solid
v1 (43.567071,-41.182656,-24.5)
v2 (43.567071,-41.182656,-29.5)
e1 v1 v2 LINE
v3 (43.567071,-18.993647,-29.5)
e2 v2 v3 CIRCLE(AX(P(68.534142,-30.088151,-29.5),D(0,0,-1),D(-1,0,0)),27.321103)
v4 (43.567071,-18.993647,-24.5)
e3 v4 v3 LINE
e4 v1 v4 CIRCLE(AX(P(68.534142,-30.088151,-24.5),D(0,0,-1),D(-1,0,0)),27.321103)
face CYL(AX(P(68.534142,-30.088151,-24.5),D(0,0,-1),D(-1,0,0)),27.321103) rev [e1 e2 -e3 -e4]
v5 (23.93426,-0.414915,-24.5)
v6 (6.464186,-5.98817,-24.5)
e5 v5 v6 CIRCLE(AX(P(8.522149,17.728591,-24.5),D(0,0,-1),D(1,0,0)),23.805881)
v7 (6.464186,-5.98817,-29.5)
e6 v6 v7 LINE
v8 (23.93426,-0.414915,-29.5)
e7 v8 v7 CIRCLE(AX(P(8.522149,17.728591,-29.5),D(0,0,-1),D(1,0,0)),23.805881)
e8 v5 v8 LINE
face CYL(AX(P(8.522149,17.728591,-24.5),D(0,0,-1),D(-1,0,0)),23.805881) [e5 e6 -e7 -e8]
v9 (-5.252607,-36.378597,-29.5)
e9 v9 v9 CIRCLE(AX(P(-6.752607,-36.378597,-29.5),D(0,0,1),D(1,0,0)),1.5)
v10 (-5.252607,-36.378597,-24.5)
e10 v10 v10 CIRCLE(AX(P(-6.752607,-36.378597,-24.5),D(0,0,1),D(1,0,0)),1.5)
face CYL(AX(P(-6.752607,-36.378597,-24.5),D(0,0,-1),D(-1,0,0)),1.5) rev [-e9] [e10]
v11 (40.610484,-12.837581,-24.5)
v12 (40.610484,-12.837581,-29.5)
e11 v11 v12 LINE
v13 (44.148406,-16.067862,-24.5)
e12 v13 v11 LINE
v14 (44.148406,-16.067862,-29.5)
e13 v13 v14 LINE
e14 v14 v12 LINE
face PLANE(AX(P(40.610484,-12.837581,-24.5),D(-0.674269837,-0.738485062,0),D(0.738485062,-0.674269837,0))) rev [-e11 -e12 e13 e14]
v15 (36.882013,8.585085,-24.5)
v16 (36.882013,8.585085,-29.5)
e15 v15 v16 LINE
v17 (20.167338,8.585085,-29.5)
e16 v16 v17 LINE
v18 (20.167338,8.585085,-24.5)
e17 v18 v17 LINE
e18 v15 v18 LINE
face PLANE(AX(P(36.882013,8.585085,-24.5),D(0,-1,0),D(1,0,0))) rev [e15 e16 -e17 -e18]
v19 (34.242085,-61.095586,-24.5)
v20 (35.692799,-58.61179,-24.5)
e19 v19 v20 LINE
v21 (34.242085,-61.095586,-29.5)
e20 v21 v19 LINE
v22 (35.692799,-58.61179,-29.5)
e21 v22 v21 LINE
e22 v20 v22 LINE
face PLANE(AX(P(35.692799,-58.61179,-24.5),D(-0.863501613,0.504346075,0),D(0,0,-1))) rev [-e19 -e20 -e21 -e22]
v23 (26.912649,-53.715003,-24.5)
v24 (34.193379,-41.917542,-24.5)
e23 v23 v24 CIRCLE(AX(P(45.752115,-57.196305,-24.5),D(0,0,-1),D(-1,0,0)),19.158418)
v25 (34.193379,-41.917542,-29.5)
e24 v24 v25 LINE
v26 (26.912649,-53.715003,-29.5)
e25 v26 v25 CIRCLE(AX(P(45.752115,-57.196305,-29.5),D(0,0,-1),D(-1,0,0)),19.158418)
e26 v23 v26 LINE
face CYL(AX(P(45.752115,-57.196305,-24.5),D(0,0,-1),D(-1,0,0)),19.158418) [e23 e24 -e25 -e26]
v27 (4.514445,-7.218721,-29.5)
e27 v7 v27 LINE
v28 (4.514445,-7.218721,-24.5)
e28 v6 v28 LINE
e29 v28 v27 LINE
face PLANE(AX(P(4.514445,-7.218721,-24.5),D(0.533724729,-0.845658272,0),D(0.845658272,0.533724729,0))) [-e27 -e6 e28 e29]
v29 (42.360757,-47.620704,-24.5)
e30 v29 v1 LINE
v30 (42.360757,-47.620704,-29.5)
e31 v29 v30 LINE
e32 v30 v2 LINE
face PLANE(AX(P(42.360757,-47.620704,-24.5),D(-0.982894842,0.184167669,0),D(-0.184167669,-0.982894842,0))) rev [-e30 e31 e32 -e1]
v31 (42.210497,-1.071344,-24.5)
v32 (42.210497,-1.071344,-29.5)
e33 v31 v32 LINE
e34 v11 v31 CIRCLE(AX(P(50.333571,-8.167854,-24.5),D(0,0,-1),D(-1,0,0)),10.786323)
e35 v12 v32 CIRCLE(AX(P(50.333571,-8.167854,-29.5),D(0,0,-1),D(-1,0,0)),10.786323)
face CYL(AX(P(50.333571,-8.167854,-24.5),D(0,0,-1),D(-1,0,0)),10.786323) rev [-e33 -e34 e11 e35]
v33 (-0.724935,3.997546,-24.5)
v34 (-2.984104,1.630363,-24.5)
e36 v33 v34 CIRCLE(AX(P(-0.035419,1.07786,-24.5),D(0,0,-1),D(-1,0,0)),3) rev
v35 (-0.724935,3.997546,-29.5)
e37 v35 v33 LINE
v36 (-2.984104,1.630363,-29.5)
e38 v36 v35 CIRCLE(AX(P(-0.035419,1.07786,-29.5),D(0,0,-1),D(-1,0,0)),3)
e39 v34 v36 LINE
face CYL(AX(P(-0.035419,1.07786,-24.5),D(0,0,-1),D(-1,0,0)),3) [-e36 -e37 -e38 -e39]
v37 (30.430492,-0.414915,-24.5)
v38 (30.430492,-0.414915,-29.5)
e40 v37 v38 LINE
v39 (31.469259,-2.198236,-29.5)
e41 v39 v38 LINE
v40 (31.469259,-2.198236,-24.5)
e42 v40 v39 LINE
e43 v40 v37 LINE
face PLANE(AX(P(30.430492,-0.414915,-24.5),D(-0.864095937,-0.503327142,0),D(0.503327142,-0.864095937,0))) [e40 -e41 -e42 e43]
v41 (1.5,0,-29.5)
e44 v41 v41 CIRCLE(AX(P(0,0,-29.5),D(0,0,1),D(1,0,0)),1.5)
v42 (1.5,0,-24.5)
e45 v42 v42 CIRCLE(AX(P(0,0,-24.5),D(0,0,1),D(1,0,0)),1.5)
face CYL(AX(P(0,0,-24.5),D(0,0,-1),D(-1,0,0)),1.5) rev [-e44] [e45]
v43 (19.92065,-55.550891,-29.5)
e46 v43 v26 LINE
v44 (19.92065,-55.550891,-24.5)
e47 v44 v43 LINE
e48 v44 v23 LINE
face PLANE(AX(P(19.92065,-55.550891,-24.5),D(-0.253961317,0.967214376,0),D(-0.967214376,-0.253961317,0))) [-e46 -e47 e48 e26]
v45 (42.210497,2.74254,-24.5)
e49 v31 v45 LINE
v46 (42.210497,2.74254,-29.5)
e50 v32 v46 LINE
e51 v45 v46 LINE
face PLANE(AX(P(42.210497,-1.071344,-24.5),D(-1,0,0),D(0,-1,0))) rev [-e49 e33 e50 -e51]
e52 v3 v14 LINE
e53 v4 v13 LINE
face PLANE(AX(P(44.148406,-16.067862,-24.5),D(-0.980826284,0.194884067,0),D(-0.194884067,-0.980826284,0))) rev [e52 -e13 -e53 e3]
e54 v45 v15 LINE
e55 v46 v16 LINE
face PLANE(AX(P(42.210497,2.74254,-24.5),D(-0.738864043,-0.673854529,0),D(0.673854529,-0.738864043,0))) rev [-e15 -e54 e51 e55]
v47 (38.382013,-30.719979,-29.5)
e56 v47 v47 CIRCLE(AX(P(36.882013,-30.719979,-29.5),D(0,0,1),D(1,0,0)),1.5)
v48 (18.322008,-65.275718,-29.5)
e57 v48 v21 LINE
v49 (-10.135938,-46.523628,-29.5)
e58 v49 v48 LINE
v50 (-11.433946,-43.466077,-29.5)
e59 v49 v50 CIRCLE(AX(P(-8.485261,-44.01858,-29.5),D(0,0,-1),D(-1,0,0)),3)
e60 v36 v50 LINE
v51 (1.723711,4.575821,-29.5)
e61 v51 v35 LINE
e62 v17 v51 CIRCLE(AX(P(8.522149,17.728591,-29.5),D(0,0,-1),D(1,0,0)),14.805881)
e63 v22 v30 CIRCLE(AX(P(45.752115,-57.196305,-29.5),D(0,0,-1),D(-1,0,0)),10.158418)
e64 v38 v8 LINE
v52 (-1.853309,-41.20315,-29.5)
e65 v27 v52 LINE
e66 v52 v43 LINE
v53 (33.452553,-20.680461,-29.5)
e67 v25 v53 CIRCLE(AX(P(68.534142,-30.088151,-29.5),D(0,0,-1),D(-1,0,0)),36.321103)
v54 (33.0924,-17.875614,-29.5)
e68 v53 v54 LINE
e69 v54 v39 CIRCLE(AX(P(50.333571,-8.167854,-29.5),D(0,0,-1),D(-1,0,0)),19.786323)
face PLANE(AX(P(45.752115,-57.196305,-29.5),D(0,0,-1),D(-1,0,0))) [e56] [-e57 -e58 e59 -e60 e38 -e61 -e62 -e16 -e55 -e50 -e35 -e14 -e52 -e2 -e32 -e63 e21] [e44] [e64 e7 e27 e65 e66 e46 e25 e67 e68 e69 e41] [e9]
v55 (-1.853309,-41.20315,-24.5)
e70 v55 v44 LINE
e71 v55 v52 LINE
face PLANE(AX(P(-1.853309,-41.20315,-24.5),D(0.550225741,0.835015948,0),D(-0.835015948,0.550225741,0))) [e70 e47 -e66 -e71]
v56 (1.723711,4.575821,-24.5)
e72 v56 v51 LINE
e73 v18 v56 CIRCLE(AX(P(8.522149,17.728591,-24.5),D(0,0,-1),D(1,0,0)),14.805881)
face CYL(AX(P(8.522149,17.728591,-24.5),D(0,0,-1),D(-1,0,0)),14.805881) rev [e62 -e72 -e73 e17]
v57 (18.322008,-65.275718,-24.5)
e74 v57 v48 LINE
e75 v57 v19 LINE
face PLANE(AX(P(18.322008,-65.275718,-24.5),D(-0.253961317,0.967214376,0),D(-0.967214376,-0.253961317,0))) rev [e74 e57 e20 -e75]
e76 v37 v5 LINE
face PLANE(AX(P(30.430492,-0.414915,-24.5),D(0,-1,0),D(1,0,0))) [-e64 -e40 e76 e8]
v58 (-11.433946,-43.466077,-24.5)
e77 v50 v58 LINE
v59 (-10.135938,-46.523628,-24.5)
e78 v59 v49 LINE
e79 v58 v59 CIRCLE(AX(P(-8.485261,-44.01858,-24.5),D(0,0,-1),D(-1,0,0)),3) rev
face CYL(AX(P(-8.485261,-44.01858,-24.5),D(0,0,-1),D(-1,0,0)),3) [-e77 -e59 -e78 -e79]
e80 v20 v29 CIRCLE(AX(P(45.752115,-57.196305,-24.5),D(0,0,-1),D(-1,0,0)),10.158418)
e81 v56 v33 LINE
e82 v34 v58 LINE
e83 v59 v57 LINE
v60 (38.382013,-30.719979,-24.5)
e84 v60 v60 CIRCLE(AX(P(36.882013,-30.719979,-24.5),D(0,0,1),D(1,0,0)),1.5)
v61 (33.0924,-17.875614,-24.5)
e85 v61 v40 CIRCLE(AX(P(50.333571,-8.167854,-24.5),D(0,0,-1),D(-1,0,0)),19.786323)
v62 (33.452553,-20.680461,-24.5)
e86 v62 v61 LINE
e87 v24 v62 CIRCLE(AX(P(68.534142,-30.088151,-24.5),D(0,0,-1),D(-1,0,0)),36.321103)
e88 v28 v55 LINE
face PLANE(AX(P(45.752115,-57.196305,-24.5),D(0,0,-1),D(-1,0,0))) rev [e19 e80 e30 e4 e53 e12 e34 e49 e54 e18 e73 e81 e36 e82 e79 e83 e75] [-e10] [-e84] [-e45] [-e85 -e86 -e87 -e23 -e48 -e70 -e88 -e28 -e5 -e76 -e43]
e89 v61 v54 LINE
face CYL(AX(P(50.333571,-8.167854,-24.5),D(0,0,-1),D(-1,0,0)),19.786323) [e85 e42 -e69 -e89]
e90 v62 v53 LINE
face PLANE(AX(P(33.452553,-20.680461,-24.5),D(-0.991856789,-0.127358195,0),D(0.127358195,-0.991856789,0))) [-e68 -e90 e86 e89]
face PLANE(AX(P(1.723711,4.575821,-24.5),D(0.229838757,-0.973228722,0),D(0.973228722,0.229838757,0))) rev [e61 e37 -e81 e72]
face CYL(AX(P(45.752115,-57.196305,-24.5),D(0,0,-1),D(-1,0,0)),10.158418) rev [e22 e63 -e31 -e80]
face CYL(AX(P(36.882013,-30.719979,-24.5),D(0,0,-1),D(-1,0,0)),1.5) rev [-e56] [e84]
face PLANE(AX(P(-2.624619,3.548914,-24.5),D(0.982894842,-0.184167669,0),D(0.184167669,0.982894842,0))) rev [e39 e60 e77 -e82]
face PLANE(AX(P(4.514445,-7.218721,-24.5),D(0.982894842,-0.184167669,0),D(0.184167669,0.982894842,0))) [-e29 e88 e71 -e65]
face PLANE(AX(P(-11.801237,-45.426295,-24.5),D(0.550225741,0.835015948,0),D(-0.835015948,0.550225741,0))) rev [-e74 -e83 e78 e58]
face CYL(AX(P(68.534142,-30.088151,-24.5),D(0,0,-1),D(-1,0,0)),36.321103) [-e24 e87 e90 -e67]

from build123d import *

# Parameters (mm, degrees)
SKETCH2_R           = 1.5
BOSS_EXTRUDE1_DEPTH = 5
FILLET1_R           = 3
CHAMFER3_SIZE       = 2


with BuildPart() as part:
    # Sketch2 → Boss-Extrude1 (new body)
    with BuildSketch(Plane.XY.offset(-29.5)):
        with BuildLine():
            Line((-2.624619354, 3.548914368), (-11.801237054, -45.426295313))
            Line((-11.801237054, -45.426295313), (18.322008005, -65.275718381))
            Line((18.322008005, -65.275718381), (36.176514182, -60.587663687))
            ThreePointArc((36.176514182, -60.587663687), (36.583090059, -52.82338526), (42.360756545, -47.620703893))
            Line((42.360756545, -47.620703893), (43.567071105, -41.182655532))
            ThreePointArc((43.567071105, -41.182655532), (41.213039161, -30.088151018), (43.567071105, -18.993646503))
            Line((43.567071105, -18.993646503), (44.148406248, -16.06786198))
            Line((44.148406248, -16.06786198), (40.610484334, -12.837581299))
            ThreePointArc((40.610484334, -12.837581299), (39.645613087, -6.714468603), (42.210497415, -1.071344115))
            Line((42.210497415, -1.071344115), (42.210497415, 2.742539662))
            Line((42.210497415, 2.742539662), (36.882012848, 8.585085022))
            Line((36.882012848, 8.585085022), (20.167337536, 8.585085022))
            ThreePointArc((20.167337536, 8.585085022), (11.667192324, 3.260597998), (1.723711062, 4.575820826))
            Line((1.723711062, 4.575820826), (-2.624619354, 3.548914368))
        make_face()
        Circle(SKETCH2_R, mode=Mode.SUBTRACT)
        with Locations((36.882012848, -30.719979302)):
            Circle(SKETCH2_R, mode=Mode.SUBTRACT)
        with Locations((-6.752606997, -36.378596712)):
            Circle(SKETCH2_R, mode=Mode.SUBTRACT)
        with BuildLine():
            Line((-1.853309264, -41.203149553), (19.920649662, -55.5508907))
            Line((19.920649662, -55.5508907), (26.912648631, -53.715002702))
            ThreePointArc((26.912648631, -53.715002702), (29.448505151, -47.134631862), (34.193378933, -41.917542493))
            ThreePointArc((34.193378933, -41.917542493), (32.235117961, -31.354391616), (33.452553096, -20.680461028))
            Line((33.452553096, -20.680461028), (33.092400062, -17.875614172))
            ThreePointArc((33.092400062, -17.875614172), (30.652450166, -10.205517854), (31.469259091, -2.198236405))
            Line((31.469259091, -2.198236405), (30.430492401, -0.414914978))
            Line((30.430492401, -0.414914978), (23.934260151, -0.414914978))
            ThreePointArc((23.934260151, -0.414914978), (15.757383222, -4.951165755), (6.464186316, -5.988170424))
            Line((6.464186316, -5.988170424), (4.514445223, -7.21872072))
            Line((4.514445223, -7.21872072), (-1.853309264, -41.203149553))
        make_face(mode=Mode.SUBTRACT)
    extrude(amount=BOSS_EXTRUDE1_DEPTH)

    # Fillet1
    fillet1_edges = [part.edges().sort_by_distance(p)[0] for p in [
        (-11.801237054, -45.426295313, -27),
        (-2.624619354, 3.548914368, -27),
    ]]
    fillet(fillet1_edges, radius=FILLET1_R)

    # Chamfer3
    # the kernel refuses this chamfer: 2, 1.851821387 mm, written as the material it takes off along each edge
    with BuildSketch(Plane(origin=(36.176514182, -60.587663687, -34.731164248), x_dir=(-0.9672143762553561, -0.25396131667039873, 0), z_dir=(0, 0, 1))) as chamfer3_piece_1:
        with BuildLine():
            Line((CHAMFER3_SIZE, 0), (-0.03393884, -2.03393884))
            ThreePointArc((-0.03393884, -2.03393884), (0.03354605, -1.046793416), (0, 0))
            Line((0, 0), (CHAMFER3_SIZE, 0))
        make_face()
    extrude(amount=15.462328496, mode=Mode.SUBTRACT)


solid = part.part
